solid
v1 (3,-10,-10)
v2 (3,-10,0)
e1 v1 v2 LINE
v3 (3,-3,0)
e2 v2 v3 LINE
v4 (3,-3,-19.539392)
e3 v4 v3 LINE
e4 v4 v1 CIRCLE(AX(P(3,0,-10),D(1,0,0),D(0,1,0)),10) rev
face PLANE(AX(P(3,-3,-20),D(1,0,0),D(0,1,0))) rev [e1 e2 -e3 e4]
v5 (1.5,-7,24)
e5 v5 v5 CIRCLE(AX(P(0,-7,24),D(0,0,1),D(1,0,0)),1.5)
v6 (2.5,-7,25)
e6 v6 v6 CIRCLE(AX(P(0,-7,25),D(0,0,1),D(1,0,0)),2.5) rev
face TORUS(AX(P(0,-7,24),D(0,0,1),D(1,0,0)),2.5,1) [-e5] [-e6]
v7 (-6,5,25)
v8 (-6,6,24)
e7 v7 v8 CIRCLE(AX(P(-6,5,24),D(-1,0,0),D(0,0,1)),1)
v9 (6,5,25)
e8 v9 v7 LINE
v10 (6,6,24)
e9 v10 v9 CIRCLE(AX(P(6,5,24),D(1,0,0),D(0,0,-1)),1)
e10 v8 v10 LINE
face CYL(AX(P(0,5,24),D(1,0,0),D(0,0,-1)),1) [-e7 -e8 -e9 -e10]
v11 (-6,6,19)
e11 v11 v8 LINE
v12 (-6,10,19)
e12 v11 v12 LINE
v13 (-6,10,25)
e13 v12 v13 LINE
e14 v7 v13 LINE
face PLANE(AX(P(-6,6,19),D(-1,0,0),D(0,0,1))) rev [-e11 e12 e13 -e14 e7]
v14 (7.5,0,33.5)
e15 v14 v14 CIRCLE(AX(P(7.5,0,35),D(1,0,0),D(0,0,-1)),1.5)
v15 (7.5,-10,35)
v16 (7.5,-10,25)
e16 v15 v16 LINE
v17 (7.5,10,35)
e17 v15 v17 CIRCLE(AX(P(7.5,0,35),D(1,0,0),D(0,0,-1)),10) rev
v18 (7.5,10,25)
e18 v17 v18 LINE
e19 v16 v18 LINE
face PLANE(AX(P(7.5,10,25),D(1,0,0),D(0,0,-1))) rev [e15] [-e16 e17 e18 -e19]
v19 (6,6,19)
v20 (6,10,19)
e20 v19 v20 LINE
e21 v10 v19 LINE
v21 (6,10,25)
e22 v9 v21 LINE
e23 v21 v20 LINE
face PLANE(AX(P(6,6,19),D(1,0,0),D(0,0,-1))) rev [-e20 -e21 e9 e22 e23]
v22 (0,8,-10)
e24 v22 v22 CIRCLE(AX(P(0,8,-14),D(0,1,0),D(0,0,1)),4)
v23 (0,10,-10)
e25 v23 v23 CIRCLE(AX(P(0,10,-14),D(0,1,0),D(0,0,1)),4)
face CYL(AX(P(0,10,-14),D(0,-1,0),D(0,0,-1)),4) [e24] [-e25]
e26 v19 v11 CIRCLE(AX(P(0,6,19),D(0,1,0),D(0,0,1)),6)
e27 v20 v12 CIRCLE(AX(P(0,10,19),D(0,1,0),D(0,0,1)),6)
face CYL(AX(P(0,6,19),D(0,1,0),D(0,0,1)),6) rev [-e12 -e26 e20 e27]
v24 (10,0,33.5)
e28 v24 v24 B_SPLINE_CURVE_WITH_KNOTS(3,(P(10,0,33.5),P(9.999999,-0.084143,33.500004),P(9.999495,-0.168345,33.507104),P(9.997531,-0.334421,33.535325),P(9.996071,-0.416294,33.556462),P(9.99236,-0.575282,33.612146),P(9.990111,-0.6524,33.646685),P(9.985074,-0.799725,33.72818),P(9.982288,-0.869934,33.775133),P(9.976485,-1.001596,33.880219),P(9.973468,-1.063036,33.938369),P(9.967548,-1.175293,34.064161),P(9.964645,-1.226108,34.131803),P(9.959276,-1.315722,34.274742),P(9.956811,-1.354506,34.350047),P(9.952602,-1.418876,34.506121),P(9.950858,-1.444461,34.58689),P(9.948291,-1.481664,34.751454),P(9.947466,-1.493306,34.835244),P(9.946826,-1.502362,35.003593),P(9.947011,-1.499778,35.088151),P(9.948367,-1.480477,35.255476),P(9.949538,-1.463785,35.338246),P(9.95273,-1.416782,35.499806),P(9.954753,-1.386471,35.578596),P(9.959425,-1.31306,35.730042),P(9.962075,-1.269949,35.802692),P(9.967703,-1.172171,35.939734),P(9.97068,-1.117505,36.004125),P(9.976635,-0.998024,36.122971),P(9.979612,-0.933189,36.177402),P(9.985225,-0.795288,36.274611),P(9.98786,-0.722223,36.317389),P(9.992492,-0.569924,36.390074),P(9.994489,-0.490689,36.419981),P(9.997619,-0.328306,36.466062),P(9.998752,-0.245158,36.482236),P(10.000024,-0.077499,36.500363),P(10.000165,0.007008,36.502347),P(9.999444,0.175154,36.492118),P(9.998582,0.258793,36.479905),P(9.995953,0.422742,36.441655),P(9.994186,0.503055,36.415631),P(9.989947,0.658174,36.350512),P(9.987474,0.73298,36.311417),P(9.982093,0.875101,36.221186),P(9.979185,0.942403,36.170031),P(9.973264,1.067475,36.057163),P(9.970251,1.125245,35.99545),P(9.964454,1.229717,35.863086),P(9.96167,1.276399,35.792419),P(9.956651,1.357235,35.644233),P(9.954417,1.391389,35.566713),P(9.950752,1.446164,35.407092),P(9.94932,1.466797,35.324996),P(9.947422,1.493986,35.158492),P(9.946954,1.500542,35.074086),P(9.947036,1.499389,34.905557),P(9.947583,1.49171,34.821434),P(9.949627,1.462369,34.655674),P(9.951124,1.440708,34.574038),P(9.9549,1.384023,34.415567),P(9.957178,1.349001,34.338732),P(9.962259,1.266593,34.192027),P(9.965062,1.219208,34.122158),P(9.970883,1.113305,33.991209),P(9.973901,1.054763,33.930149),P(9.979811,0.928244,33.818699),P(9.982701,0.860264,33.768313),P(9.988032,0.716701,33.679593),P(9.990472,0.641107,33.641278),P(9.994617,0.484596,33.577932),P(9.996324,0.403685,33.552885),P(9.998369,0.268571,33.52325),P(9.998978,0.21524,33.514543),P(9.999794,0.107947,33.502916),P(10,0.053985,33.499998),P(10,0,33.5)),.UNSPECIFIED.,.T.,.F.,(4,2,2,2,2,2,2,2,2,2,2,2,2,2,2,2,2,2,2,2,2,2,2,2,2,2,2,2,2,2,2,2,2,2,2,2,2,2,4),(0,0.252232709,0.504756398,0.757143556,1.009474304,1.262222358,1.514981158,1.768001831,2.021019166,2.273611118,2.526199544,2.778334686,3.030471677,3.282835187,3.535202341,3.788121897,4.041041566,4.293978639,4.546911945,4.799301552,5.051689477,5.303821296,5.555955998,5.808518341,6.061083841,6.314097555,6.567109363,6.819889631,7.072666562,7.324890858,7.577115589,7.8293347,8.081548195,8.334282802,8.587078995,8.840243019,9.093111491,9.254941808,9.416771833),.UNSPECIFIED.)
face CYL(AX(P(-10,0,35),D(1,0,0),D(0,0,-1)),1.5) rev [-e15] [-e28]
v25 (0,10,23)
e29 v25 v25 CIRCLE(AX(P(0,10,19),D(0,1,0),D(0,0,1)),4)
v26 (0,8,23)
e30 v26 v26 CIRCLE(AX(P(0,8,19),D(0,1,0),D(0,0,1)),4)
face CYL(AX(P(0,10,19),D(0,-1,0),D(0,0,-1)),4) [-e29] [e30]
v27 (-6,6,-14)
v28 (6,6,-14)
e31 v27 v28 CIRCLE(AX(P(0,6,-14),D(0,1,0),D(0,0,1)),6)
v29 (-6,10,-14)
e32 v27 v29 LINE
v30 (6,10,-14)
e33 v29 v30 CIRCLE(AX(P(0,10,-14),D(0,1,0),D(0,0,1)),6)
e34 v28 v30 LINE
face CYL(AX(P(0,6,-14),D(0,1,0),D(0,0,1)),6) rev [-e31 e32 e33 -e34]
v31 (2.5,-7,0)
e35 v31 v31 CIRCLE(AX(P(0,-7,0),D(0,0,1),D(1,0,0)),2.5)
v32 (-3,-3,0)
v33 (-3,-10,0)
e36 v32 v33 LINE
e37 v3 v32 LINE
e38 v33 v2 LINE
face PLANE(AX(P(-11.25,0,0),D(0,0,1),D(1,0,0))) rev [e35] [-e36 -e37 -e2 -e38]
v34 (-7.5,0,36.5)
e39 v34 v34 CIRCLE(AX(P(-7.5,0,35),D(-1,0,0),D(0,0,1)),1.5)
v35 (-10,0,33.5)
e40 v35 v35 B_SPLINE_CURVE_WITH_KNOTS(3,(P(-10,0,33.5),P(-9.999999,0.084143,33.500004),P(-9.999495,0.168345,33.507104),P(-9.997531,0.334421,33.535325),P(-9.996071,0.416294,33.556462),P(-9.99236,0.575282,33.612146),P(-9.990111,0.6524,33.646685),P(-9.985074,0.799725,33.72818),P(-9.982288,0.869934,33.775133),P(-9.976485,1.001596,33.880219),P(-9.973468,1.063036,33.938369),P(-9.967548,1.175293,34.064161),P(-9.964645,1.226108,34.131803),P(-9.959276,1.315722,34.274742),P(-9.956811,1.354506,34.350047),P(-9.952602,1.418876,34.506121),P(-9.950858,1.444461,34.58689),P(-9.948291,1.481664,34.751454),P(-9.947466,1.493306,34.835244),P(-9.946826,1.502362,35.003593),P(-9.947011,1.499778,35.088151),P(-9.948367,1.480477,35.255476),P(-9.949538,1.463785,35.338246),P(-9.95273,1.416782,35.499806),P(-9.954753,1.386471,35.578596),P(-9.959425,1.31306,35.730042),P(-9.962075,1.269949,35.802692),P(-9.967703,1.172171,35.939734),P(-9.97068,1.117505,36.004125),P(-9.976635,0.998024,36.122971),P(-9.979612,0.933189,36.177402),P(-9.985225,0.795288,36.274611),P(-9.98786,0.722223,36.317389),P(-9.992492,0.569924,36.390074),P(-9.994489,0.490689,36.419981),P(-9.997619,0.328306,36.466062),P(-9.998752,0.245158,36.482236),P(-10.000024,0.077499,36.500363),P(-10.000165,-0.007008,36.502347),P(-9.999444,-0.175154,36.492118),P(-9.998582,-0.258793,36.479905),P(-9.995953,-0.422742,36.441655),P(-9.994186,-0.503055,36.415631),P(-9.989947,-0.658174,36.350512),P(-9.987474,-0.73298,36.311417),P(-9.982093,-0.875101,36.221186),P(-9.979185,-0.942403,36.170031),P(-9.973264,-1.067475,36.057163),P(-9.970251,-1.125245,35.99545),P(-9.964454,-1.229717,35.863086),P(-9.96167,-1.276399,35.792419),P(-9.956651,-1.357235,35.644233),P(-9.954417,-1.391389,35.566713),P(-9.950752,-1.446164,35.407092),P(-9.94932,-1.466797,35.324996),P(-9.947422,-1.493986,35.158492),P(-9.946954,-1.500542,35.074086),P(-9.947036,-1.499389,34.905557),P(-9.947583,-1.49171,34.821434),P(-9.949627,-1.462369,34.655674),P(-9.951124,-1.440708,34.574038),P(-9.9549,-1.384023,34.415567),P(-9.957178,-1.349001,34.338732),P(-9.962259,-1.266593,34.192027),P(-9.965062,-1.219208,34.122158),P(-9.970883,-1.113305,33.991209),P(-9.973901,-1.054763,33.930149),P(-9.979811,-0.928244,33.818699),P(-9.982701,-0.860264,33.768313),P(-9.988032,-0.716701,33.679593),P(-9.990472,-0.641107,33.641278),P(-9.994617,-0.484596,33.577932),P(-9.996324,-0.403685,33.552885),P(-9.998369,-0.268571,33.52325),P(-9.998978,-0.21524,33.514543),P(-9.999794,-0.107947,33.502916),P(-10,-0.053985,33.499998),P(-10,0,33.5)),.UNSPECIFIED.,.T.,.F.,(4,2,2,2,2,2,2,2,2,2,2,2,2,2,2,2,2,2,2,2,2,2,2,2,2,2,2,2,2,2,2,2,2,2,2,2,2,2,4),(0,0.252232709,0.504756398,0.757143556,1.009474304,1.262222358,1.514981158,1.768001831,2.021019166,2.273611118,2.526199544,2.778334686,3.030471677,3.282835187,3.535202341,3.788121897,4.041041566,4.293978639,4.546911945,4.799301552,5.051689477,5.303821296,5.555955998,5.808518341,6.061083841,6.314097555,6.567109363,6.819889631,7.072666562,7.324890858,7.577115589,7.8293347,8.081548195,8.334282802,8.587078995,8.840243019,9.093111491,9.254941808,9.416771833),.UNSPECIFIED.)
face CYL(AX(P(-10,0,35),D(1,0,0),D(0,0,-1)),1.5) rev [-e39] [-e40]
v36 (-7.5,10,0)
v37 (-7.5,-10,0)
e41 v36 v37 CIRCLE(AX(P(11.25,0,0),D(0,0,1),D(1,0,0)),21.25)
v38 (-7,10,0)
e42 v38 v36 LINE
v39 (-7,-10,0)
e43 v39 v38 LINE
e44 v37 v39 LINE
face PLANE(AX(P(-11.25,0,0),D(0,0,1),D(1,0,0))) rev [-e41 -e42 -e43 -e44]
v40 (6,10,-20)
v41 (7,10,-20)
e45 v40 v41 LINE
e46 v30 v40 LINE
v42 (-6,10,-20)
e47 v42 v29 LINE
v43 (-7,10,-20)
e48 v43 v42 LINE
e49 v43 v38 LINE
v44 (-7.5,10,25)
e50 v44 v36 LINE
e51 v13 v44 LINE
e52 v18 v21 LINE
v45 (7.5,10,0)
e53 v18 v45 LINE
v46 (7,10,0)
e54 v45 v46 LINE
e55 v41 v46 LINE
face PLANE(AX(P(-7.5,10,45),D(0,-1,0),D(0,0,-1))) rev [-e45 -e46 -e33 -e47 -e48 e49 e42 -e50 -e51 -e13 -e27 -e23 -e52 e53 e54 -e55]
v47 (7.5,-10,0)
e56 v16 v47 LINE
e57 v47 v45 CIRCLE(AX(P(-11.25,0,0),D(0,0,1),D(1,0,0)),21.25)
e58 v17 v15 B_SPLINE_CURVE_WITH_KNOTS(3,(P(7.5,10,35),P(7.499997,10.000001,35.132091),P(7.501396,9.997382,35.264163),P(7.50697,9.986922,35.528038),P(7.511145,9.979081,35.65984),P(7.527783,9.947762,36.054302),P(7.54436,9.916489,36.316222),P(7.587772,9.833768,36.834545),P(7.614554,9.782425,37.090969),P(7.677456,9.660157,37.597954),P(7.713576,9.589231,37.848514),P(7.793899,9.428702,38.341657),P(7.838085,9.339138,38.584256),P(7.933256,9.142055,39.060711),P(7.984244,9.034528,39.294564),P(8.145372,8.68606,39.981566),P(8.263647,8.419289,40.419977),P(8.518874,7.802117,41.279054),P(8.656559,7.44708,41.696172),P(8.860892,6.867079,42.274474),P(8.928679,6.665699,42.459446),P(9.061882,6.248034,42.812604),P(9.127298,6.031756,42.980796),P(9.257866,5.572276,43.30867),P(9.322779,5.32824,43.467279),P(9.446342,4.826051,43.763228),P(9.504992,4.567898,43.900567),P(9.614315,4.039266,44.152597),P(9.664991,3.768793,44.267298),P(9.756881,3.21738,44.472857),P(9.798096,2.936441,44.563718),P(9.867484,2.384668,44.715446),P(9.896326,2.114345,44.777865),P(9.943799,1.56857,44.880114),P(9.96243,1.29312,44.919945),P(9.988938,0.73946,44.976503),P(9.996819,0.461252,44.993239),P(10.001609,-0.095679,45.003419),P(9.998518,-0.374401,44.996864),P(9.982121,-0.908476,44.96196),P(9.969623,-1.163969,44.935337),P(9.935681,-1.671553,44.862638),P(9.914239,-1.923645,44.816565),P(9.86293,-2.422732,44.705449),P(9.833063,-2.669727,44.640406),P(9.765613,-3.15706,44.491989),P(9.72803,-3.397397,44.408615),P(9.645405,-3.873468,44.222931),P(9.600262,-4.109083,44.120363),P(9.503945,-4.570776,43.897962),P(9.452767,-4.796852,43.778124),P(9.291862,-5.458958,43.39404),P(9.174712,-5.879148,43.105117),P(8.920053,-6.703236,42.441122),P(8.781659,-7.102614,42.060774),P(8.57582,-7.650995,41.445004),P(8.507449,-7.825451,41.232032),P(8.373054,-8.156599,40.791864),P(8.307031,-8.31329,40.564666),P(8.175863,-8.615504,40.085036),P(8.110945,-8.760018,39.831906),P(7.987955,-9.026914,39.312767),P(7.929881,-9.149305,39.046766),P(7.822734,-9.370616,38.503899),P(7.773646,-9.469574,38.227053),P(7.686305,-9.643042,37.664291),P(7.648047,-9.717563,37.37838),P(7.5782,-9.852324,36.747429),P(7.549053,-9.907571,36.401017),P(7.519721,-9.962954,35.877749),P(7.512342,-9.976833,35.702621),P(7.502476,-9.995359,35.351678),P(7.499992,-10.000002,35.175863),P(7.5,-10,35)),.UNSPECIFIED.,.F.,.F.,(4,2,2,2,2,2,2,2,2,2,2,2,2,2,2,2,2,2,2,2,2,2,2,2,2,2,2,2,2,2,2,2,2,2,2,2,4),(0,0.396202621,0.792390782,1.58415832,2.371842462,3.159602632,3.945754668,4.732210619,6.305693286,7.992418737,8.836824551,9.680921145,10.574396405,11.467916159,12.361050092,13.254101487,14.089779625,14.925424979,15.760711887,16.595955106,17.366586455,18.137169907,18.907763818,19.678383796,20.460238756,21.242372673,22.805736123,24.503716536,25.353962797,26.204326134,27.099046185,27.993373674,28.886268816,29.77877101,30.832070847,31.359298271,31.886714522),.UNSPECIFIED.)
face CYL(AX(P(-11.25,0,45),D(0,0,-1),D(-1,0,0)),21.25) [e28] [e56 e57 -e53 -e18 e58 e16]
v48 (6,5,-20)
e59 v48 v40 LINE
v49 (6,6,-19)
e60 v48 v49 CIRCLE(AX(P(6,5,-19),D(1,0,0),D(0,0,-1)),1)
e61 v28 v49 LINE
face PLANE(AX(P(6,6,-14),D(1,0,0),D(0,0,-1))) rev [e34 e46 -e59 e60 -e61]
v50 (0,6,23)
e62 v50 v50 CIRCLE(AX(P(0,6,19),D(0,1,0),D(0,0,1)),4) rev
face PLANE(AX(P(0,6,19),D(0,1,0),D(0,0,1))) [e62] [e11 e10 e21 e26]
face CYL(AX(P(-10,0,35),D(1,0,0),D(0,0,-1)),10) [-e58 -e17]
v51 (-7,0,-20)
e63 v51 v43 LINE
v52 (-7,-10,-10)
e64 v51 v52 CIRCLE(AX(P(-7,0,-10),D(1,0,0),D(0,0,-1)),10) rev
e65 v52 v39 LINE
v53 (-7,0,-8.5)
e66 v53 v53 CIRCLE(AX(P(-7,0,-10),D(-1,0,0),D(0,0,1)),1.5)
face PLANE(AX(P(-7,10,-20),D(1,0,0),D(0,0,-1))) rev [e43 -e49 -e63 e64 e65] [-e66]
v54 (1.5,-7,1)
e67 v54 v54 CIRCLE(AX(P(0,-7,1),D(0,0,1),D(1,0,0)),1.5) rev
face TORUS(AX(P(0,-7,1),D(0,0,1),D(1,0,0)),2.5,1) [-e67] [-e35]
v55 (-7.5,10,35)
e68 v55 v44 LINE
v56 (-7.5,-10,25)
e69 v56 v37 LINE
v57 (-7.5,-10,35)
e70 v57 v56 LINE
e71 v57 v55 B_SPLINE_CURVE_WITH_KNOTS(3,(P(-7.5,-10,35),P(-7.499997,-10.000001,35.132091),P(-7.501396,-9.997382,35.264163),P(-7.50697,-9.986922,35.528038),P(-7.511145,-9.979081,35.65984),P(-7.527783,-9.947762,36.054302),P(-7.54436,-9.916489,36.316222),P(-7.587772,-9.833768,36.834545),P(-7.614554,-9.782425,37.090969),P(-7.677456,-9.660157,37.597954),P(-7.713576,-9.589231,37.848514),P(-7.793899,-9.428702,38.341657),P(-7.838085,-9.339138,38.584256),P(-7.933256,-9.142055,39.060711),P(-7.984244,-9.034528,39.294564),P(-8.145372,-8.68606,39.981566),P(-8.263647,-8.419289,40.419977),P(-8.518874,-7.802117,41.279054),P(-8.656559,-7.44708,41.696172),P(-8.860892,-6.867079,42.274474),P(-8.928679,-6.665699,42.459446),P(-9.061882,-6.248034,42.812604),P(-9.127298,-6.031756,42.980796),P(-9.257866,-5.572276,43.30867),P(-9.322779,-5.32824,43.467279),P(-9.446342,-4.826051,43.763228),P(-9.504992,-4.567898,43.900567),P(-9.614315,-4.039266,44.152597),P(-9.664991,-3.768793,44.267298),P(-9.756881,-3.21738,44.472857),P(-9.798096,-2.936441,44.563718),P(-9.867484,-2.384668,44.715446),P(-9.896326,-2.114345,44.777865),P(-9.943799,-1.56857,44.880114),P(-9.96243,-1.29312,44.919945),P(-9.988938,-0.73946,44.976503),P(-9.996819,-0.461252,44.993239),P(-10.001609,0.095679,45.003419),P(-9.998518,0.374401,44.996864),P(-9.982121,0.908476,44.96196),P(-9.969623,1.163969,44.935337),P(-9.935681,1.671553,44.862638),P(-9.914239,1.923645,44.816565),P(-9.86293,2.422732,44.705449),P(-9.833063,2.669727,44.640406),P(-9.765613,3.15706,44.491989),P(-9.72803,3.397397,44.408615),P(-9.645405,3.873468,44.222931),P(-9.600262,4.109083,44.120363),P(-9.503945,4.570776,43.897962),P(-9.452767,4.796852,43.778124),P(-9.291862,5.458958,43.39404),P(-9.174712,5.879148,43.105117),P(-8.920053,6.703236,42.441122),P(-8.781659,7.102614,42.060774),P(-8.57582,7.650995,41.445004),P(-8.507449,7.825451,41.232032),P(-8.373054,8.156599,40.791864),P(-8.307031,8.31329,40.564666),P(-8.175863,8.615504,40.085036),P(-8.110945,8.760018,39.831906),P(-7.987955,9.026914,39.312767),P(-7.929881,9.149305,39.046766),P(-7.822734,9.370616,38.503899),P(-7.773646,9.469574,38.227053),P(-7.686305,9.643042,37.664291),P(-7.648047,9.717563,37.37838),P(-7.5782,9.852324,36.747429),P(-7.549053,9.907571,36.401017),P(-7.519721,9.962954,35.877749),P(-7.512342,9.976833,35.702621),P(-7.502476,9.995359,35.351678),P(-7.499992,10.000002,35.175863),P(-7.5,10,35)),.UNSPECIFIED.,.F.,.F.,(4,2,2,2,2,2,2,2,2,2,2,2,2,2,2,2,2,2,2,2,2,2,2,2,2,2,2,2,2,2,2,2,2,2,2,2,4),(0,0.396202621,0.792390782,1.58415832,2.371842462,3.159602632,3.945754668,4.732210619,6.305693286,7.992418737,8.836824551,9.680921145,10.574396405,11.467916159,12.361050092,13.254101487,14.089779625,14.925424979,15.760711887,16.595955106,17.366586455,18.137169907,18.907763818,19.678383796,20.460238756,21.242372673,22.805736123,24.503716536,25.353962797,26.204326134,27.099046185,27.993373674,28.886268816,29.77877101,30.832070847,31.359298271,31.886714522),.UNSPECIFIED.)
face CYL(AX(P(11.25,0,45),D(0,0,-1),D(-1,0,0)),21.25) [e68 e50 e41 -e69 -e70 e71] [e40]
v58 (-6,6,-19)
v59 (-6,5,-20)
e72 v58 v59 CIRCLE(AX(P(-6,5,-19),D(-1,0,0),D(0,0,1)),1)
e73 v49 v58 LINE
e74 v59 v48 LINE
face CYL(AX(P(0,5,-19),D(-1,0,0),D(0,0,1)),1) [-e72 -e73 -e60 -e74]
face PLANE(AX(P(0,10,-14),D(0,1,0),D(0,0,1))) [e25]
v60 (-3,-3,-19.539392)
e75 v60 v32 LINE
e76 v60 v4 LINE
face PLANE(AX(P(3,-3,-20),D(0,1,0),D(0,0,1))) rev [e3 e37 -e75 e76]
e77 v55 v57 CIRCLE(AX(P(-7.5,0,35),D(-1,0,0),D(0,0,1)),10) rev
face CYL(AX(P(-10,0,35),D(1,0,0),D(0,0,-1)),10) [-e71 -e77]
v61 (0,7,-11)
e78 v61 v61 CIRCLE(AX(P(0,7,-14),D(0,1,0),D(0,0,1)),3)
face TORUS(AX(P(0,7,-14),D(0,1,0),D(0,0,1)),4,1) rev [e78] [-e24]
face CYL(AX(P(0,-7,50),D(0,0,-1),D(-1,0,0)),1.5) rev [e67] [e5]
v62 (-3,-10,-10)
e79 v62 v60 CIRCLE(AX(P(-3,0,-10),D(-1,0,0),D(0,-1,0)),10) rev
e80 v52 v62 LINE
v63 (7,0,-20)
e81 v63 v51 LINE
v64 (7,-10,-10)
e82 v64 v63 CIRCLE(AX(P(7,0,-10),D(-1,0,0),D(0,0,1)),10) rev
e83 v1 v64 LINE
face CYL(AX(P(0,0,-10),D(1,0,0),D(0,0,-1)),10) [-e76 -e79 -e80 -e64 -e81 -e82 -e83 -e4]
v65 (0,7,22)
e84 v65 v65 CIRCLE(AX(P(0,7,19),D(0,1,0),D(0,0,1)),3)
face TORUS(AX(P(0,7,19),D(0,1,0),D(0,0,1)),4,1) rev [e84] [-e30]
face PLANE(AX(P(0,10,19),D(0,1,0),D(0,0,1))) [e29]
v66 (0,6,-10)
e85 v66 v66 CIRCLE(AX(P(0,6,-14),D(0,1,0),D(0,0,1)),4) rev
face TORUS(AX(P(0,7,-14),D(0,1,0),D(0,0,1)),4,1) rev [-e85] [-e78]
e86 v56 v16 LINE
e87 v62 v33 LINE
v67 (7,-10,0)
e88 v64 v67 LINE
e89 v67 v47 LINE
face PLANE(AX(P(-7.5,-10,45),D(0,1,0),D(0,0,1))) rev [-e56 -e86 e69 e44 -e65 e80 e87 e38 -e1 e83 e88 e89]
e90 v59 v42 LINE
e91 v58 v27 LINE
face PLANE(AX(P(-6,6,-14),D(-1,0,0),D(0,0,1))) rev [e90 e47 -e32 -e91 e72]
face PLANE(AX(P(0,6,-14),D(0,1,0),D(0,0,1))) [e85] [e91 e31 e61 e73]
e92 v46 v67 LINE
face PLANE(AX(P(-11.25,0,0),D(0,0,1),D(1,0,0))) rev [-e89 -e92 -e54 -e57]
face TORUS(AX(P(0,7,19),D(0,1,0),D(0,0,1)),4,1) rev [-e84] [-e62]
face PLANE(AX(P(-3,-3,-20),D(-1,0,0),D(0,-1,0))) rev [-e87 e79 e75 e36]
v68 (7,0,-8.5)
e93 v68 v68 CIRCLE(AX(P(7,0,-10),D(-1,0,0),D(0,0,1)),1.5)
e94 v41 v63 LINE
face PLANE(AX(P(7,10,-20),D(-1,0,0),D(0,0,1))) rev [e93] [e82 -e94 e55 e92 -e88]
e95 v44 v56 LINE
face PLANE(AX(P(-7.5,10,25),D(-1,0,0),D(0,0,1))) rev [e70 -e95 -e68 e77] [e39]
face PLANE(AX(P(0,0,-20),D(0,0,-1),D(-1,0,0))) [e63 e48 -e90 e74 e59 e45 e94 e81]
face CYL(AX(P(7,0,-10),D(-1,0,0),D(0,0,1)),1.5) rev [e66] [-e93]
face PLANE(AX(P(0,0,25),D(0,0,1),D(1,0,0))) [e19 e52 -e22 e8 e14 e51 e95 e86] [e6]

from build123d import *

# Parameters (mm, degrees)
SALIENTE_EXTRUIR2_DEPTH    = 45
CROQUIS4_R                 = 1.5
CORTAR_EXTRUIR1_DEPTH      = 50
SALIENTE_EXTRUIR3_DEPTH    = 20
CROQUIS8_R                 = 1.5
CORTAR_EXTRUIR4_DEPTH      = 14
REDONDEO1_R                = 10
CROQUIS6_W                 = 15
CROQUIS6_H                 = 20
CORTAR_EXTRUIR2_DEPTH      = 20
CORTAR_EXTRUIR3_DEPTH      = 48.16990566
CORTAR_EXTRUIR3_DEPTH_BACK = 48.16990566
CROQUIS7_R                 = 1.5
CUT_EXTRUDE1_DEPTH         = 4
SKETCH2_R                  = 3
BOSS_EXTRUDE1_DEPTH        = 2
SKETCH3_R                  = 4
BOSS_EXTRUDE2_DEPTH        = 2
FILLET2_R                  = 1
FILLET3_R                  = 1
FILLET4_R                  = 1


with BuildPart() as part:
    # Croquis2 → Saliente-Extruir2 (new body)
    with BuildSketch(Plane.XY):
        with BuildLine():
            Line((-7.5, -10), (7.5, -10))
            ThreePointArc((7.5, -10), (10, 0), (7.5, 10))
            Line((7.5, 10), (-7.5, 10))
            ThreePointArc((-7.5, 10), (-10, 0), (-7.5, -10))
        make_face()
    extrude(amount=SALIENTE_EXTRUIR2_DEPTH)

    # Croquis4 → Cortar-Extruir1 (cut)
    with BuildSketch(Plane(origin=(0, 0, 0), x_dir=(-1, 0, 0), z_dir=(0, 0, -1))):
        with Locations((0, -7)):
            Circle(CROQUIS4_R)
    extrude(amount=-CORTAR_EXTRUIR1_DEPTH, mode=Mode.SUBTRACT)

    # Croquis3 → Saliente-Extruir3 (add)
    with BuildSketch(Plane(origin=(0, 0, 0), x_dir=(-1, 0, 0), z_dir=(0, 0, -1))):
        Polygon((7, 10), (7, -10), (3, -10), (3, -3), (-3, -3), (-3, -10), (-7, -10), (-7, 10), align=None)
    extrude(amount=SALIENTE_EXTRUIR3_DEPTH)

    # Croquis8 → Cortar-Extruir4 (cut)
    with BuildSketch(Plane.ZY.offset(7)):
        with Locations((-10, 0)):
            Circle(CROQUIS8_R)
    extrude(amount=-CORTAR_EXTRUIR4_DEPTH, mode=Mode.SUBTRACT)

    # Redondeo1
    redondeo1_edges = [part.edges().sort_by_distance(p)[0] for p in [
        (5, -10, -20),
    ]]
    fillet(redondeo1_edges, radius=REDONDEO1_R)

    # Croquis6 → Cortar-Extruir2 (cut)
    with BuildSketch(Plane.XY.offset(45)):
        Rectangle(CROQUIS6_W, CROQUIS6_H)
    extrude(amount=-CORTAR_EXTRUIR2_DEPTH, mode=Mode.SUBTRACT)

    # Croquis7 → Cortar-Extruir3 (cut, two sides: drawn at the far end of the back side and taken through both)
    with BuildSketch(Plane(origin=(0, 0, 0), x_dir=(0, 0, -1), z_dir=(1, 0, 0)).offset(-CORTAR_EXTRUIR3_DEPTH_BACK)):
        with Locations((-35, 0)):
            Circle(CROQUIS7_R)
        with BuildLine():
            Line((-35, -10), (-50, -10))
            Line((-50, -10), (-50, 10))
            Line((-50, 10), (-35, 10))
            ThreePointArc((-35, 10), (-45, 0), (-35, -10))
        make_face()
    extrude(amount=CORTAR_EXTRUIR3_DEPTH + CORTAR_EXTRUIR3_DEPTH_BACK, mode=Mode.SUBTRACT)

    # Sketch1 → Cut-Extrude1 (cut)
    with BuildSketch(Plane(origin=(0, 10, 0), x_dir=(1, 0, 0), z_dir=(0, 1, 0))):
        with BuildLine():
            Line((-6, 14), (-6, 20))
            Line((-6, 20), (6, 20))
            Line((6, 20), (6, 14))
            ThreePointArc((6, 14), (0, 8), (-6, 14))
        make_face()
        with BuildLine():
            Line((-6, -19), (-6, -25))
            Line((-6, -25), (6, -25))
            Line((6, -25), (6, -19))
            ThreePointArc((6, -19), (0, -13), (-6, -19))
        make_face()
    extrude(amount=-CUT_EXTRUDE1_DEPTH, mode=Mode.SUBTRACT)

    # Sketch2 → Boss-Extrude1 (add)
    with BuildSketch(Plane(origin=(0, 6, 0), x_dir=(1, 0, 0), z_dir=(0, 1, 0))):
        with Locations(Location((0, -19, 0), (0, 0, 270))):
            Circle(SKETCH2_R)
        with Locations(Location((0, 14, 0), (0, 0, 270))):
            Circle(SKETCH2_R)
    extrude(amount=BOSS_EXTRUDE1_DEPTH)

    # Sketch3 → Boss-Extrude2 (add)
    with BuildSketch(Plane(origin=(0, 8, 0), x_dir=(1, 0, 0), z_dir=(0, 1, 0))):
        with Locations(Location((0, -19, 0), (0, 0, 270))):
            Circle(SKETCH3_R)
        with Locations(Location((0, 14, 0), (0, 0, 270))):
            Circle(SKETCH3_R)
    extrude(amount=BOSS_EXTRUDE2_DEPTH)

    # Fillet2
    fillet2_edges = [part.edges().sort_by_distance(p)[0] for p in [
        (0, 6, 16),
        (0, 8, 16),
        (0, 6, -17),
        (0, 8, -17),
    ]]
    fillet(fillet2_edges, radius=FILLET2_R - 0.0001)  # a hair under: the kernel refuses the full size

    # Fillet3
    fillet3_edges = [part.edges().sort_by_distance(p)[0] for p in [
        (0, 6, -20),
        (0, 6, 25),
    ]]
    fillet(fillet3_edges, radius=FILLET3_R)

    # Fillet4
    fillet4_edges = [part.edges().sort_by_distance(p)[0] for p in [
        (1.5, -7, 0),
        (1.5, -7, 25),
    ]]
    fillet(fillet4_edges, radius=FILLET4_R)


solid = part.part
